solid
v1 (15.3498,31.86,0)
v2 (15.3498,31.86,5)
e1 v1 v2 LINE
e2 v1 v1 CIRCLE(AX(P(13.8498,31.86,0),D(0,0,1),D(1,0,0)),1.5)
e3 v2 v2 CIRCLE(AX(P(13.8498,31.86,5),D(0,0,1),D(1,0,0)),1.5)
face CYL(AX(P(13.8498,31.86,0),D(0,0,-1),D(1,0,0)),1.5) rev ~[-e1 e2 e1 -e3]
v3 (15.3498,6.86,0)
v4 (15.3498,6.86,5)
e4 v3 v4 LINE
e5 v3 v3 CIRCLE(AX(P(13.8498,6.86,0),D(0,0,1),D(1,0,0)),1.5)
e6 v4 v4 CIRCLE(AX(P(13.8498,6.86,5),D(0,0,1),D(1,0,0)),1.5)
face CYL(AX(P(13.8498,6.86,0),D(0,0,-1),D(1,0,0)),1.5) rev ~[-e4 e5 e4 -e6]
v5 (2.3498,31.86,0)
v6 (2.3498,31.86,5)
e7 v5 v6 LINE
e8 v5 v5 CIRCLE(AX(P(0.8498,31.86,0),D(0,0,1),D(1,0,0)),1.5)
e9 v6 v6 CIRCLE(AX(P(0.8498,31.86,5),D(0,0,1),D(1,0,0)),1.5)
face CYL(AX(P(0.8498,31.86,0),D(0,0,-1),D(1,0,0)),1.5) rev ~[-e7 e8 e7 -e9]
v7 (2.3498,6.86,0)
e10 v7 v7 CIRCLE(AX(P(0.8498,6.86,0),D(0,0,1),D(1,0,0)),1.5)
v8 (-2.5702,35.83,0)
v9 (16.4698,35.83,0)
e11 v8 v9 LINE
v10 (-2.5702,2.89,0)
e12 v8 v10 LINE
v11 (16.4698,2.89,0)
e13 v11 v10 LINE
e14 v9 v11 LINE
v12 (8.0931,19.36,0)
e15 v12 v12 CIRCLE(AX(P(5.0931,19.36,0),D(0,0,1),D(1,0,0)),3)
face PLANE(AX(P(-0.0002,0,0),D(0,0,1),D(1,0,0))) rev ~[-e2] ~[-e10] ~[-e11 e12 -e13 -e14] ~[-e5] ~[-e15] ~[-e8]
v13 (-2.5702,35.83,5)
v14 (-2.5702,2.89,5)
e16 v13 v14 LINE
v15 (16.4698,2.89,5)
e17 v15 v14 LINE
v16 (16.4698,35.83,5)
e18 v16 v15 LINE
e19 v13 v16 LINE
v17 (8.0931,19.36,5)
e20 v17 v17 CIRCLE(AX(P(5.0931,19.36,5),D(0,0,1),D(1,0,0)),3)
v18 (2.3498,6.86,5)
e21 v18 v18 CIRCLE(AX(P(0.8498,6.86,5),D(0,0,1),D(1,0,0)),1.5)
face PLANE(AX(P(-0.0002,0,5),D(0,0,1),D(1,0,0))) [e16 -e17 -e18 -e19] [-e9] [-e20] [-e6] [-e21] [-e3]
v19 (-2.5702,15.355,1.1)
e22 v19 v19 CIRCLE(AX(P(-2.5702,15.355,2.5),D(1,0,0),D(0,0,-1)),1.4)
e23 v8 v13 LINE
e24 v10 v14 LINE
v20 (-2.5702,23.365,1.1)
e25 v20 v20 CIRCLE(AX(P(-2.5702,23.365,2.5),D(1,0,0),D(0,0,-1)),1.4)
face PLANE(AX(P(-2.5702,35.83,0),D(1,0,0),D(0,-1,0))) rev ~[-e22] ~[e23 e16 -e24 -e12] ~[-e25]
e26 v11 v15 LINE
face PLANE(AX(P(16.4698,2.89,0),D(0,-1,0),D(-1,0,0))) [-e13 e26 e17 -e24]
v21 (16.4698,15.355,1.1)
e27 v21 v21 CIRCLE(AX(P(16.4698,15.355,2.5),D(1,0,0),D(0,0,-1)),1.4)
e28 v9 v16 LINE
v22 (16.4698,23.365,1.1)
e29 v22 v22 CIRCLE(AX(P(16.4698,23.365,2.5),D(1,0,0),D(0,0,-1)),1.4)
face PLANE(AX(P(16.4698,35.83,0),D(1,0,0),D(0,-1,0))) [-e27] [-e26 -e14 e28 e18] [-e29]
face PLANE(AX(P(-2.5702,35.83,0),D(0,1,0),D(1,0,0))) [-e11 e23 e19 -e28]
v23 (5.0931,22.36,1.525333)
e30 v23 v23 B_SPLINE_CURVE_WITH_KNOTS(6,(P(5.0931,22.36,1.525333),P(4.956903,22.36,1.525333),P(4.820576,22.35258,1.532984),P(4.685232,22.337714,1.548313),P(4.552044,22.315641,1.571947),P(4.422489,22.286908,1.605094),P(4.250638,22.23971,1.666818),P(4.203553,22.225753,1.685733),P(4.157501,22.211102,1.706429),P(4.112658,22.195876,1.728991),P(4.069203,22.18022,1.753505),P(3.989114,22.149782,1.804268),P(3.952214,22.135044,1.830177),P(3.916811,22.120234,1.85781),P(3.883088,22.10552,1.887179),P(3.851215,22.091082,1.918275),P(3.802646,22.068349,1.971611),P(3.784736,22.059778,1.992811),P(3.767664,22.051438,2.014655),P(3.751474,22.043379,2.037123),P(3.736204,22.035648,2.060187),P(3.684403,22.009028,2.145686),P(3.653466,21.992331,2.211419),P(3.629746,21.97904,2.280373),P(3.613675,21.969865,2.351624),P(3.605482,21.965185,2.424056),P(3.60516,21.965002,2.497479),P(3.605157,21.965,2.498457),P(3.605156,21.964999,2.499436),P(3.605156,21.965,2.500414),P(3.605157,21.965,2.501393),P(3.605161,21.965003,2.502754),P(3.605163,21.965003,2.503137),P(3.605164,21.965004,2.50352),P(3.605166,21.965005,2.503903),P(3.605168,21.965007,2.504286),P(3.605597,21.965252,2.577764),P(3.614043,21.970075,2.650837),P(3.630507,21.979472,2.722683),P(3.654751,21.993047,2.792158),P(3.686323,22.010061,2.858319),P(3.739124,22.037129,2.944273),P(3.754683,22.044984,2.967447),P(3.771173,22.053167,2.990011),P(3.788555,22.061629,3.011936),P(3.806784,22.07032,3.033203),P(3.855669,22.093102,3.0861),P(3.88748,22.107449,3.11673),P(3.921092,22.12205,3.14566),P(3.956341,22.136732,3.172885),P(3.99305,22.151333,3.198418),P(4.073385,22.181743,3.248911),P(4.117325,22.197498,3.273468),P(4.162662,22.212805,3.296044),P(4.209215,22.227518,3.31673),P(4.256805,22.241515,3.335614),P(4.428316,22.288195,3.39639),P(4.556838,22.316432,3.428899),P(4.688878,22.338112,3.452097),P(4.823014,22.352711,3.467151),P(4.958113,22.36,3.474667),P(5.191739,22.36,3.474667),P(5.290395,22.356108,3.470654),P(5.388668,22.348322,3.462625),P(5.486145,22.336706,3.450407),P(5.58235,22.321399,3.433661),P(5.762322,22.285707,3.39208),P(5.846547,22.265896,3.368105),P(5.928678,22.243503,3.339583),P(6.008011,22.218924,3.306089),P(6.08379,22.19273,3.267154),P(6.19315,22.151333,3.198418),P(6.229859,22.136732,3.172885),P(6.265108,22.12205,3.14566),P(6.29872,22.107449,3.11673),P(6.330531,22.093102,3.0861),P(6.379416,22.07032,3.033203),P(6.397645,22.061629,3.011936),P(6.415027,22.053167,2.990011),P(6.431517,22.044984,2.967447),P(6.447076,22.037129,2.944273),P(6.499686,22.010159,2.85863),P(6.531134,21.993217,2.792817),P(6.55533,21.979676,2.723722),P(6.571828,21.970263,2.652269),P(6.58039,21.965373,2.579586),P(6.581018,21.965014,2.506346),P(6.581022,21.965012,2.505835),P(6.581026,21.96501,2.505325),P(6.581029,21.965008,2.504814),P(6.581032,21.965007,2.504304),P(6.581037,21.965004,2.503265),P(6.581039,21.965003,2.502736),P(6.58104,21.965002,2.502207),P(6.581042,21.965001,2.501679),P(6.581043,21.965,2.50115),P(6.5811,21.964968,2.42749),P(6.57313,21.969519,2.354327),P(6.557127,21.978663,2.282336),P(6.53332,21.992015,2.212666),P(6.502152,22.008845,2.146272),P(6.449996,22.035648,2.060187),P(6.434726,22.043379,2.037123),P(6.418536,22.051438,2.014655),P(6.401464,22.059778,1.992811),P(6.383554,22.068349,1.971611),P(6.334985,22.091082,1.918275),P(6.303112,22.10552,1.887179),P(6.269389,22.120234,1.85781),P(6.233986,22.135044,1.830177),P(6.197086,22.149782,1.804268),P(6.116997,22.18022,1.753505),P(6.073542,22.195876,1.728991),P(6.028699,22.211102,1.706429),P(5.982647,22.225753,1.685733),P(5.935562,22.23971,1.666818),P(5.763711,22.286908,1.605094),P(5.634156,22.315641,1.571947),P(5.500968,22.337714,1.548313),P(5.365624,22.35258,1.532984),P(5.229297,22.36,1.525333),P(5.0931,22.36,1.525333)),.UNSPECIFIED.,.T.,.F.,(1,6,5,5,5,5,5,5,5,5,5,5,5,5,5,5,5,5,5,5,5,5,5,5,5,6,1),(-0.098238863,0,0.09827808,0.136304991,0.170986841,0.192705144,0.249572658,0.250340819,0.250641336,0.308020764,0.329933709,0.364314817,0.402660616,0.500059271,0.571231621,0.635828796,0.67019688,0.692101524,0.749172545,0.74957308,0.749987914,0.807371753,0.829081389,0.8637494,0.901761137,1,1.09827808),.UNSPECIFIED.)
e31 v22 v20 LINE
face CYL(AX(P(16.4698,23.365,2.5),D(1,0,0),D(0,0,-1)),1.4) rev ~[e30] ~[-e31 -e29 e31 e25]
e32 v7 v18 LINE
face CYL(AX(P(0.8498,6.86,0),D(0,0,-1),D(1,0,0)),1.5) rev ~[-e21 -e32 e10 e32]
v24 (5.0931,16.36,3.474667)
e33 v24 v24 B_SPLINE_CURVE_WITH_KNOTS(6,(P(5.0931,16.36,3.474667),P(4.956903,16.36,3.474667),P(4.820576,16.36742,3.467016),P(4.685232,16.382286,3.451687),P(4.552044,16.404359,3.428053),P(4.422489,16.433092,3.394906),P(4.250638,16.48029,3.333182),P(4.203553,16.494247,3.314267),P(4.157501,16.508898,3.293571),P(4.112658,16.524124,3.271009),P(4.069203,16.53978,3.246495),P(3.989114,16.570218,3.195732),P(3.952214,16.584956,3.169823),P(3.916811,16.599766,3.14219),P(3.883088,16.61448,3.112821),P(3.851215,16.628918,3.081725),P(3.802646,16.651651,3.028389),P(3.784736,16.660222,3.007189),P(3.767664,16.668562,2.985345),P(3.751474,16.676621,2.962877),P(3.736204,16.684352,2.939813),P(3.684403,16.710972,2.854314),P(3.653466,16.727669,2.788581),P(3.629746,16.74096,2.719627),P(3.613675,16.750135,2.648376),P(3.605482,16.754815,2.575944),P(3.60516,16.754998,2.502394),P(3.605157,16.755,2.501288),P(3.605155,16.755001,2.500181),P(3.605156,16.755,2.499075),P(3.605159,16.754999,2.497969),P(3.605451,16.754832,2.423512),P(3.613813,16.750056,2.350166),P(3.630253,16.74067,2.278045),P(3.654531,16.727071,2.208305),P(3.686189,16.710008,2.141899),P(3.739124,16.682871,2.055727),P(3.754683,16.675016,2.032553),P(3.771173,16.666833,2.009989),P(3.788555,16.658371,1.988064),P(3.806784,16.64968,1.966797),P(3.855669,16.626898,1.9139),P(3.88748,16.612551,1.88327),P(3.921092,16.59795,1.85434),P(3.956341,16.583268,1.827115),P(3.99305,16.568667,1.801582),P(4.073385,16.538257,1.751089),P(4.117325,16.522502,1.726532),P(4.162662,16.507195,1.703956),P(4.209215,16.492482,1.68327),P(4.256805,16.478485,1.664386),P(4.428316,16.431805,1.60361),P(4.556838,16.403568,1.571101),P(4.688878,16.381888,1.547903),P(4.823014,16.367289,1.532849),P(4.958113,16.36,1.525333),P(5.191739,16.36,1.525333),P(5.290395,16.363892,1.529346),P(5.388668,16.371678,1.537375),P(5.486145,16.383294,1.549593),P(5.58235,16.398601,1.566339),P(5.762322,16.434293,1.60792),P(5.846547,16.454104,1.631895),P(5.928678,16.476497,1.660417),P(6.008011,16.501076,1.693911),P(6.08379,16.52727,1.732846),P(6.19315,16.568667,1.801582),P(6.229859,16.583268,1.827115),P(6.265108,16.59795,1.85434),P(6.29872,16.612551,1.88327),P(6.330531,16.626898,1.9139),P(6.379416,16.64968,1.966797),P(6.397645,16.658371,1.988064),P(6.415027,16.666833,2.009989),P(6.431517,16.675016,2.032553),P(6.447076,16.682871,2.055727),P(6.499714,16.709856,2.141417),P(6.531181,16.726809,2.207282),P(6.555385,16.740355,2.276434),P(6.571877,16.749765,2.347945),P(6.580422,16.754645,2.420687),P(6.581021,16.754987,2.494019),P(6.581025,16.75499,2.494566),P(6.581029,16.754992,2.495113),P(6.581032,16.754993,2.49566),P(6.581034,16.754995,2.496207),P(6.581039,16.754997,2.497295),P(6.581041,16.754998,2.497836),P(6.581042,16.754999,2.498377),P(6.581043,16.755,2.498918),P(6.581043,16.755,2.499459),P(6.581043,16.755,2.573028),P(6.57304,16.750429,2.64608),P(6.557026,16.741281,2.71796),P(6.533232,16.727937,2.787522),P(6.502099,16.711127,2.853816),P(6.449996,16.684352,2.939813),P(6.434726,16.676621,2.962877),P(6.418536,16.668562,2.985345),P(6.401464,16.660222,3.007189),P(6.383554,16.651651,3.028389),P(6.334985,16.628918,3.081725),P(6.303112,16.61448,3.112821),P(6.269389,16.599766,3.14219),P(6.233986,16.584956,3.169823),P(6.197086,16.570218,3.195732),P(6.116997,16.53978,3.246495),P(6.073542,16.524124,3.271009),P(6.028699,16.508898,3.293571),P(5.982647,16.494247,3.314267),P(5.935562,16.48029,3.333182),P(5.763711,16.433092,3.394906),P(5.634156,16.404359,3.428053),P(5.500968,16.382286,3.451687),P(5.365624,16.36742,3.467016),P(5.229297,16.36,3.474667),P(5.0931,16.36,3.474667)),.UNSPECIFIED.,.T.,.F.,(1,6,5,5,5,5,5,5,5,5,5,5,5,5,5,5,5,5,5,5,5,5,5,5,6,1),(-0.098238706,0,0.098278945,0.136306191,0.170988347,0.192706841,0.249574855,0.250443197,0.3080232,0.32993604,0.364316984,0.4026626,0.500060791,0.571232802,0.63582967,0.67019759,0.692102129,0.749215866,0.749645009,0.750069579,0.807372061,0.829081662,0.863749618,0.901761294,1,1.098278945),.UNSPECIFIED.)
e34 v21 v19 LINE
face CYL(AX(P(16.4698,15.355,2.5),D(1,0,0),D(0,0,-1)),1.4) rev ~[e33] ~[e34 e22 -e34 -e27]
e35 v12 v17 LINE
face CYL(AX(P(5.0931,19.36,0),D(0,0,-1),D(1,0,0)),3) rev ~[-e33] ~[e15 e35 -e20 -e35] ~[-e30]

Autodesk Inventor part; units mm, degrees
ref_plane "YZ Plane" through (0, 0, 0) normal (1, 0, 0) x (0, 1, 0)
ref_plane "XZ Plane" through (0, 0, 0) normal (0, 1, 0) x (-1, 0, 0)
ref_plane "XY Plane" through (0, 0, 0) normal (0, 0, 1) x (1, 0, 0)
ref_plane "Arbeitsebene1" through (-0.0002, 0, 0) normal (0, 0, 1) x (1, 0, 0)
sketch "Skizze1" plane through (-0.0002, 0, 0) normal (0, 0, 1) x (1, 0, 0)
  circle A0 centre (13.85, 6.86) radius 1.5
  circle A1 centre (0.85, 31.86) radius 1.5
  circle A2 centre (13.85, 31.86) radius 1.5
  circle A3 centre (0.85, 6.86) radius 1.5
  circle A4 centre (5.0933, 19.36) radius 5.5
  line L0 (-3.07, 5.49) -> (-3.07, 33.23)
  line L1 (-3.07, 5.49) -> (-16.87, 5.49)
  line L2 (-16.87, 13.31) -> (-16.87, 5.49)
  line L3 (-16.8476, 13.31) -> (-16.87, 13.31)
  line L4 (-16.8476, 25.41) -> (-16.8476, 13.31)
  line L5 (-16.87, 25.41) -> (-16.8476, 25.41)
  line L6 (-16.87, 33.23) -> (-16.87, 25.41)
  line L7 (-3.07, 33.23) -> (-16.87, 33.23)
  line L8 (-16.87, 40.13) -> (-16.87, 44.21)
  line L9 (-20.77, 36.23) -> (-16.87, 40.13)
  line L10 (-24.85, 36.23) -> (-20.77, 36.23)
  line L11 (-24.85, 2.49) -> (-24.85, 36.23)
  line L12 (-20.77, 2.49) -> (-24.85, 2.49)
  line L13 (-16.87, -1.41) -> (-20.77, 2.49)
  line L14 (-16.87, -1.41) -> (-16.87, -5.49)
  line L15 (-16.87, -5.49) -> (16.87, -5.49)
  line L16 (16.87, -5.49) -> (16.87, -1.41)
  line L17 (20.77, 2.49) -> (16.87, -1.41)
  line L18 (24.85, 2.49) -> (20.77, 2.49)
  line L19 (24.85, 36.23) -> (24.85, 2.49)
  line L20 (20.77, 36.23) -> (24.85, 36.23)
  line L21 (16.87, 40.13) -> (20.77, 36.23)
  line L22 (16.87, 44.21) -> (16.87, 40.13)
  line L23 (-16.87, 44.21) -> (16.87, 44.21)
  line L24 (16.97, 36.33) -> (16.97, 2.39)
  line L25 (-16.97, 36.33) -> (16.97, 36.33) construction
  line L26 (-16.97, 2.39) -> (-16.97, 36.33)
  line L27 (16.97, 2.39) -> (-16.97, 2.39) construction
  line L28 (16.97, 2.39) -> (-16.97, 2.39)
  line L29 (16.47, 35.83) -> (16.47, 2.89)
  line L30 (16.47, 2.89) -> (-16.47, 2.89)
  line L31 (-16.47, 2.89) -> (-16.47, 35.83)
  line L32 (-16.47, 35.83) -> (16.47, 35.83)
  line L33 (-2.57, 35.83) -> (-2.57, 2.89)
  circle A5 centre (5.0933, 19.36) radius 3.505
  circle A6 centre (5.0933, 19.36) radius 3
  point P0 (0.0002, 0)
  point P1 (16.47, 19.36)
extrude "Extrusion1" add sketch "Skizze1" along normal blind 5 contours A4 | L33 L32 L29 L30 | A5
sketch "Skizze5" plane through (16.4698, 2.89, 0) normal (1, 0, 0) x (0, 0, -1)
  line L0 (-23, 19.975) -> (-4.8046, 19.975)
  line L1 (-23, 12.965) -> (-4.8046, 12.965)
  circle A0 centre (-2.5, 20.475) radius 1.4
  circle A1 centre (-2.5, 12.465) radius 1.4
  line L2 (-2.5, 20.475) -> (-2.5, 12.465) construction
  line L3 (0, 32.94) -> (-5, 32.94) projected
  line L4 (-5, 0) -> (-5, 32.94) projected
  line L5 (-5, 16.47) -> (0, 16.47) construction
  line L6 (0, 0) -> (0, 32.94) projected
  point P0 (0, -2.89)
  point P1 (-2.5, 32.94)
  point P2 (-2.5, 16.47)
  dimension "d19" = 2.8
  dimension "d20" = 2.8
  dimension "d21" = 0.5
  dimension "d22" = 0.5
extrude "Extrusion4" cut sketch "Skizze5" against normal through all
equation "\"d22\" = d21"
properties part number "30_Cube_Z_Focus_NEMA8_captive_micrometerscrewbase_v0"
